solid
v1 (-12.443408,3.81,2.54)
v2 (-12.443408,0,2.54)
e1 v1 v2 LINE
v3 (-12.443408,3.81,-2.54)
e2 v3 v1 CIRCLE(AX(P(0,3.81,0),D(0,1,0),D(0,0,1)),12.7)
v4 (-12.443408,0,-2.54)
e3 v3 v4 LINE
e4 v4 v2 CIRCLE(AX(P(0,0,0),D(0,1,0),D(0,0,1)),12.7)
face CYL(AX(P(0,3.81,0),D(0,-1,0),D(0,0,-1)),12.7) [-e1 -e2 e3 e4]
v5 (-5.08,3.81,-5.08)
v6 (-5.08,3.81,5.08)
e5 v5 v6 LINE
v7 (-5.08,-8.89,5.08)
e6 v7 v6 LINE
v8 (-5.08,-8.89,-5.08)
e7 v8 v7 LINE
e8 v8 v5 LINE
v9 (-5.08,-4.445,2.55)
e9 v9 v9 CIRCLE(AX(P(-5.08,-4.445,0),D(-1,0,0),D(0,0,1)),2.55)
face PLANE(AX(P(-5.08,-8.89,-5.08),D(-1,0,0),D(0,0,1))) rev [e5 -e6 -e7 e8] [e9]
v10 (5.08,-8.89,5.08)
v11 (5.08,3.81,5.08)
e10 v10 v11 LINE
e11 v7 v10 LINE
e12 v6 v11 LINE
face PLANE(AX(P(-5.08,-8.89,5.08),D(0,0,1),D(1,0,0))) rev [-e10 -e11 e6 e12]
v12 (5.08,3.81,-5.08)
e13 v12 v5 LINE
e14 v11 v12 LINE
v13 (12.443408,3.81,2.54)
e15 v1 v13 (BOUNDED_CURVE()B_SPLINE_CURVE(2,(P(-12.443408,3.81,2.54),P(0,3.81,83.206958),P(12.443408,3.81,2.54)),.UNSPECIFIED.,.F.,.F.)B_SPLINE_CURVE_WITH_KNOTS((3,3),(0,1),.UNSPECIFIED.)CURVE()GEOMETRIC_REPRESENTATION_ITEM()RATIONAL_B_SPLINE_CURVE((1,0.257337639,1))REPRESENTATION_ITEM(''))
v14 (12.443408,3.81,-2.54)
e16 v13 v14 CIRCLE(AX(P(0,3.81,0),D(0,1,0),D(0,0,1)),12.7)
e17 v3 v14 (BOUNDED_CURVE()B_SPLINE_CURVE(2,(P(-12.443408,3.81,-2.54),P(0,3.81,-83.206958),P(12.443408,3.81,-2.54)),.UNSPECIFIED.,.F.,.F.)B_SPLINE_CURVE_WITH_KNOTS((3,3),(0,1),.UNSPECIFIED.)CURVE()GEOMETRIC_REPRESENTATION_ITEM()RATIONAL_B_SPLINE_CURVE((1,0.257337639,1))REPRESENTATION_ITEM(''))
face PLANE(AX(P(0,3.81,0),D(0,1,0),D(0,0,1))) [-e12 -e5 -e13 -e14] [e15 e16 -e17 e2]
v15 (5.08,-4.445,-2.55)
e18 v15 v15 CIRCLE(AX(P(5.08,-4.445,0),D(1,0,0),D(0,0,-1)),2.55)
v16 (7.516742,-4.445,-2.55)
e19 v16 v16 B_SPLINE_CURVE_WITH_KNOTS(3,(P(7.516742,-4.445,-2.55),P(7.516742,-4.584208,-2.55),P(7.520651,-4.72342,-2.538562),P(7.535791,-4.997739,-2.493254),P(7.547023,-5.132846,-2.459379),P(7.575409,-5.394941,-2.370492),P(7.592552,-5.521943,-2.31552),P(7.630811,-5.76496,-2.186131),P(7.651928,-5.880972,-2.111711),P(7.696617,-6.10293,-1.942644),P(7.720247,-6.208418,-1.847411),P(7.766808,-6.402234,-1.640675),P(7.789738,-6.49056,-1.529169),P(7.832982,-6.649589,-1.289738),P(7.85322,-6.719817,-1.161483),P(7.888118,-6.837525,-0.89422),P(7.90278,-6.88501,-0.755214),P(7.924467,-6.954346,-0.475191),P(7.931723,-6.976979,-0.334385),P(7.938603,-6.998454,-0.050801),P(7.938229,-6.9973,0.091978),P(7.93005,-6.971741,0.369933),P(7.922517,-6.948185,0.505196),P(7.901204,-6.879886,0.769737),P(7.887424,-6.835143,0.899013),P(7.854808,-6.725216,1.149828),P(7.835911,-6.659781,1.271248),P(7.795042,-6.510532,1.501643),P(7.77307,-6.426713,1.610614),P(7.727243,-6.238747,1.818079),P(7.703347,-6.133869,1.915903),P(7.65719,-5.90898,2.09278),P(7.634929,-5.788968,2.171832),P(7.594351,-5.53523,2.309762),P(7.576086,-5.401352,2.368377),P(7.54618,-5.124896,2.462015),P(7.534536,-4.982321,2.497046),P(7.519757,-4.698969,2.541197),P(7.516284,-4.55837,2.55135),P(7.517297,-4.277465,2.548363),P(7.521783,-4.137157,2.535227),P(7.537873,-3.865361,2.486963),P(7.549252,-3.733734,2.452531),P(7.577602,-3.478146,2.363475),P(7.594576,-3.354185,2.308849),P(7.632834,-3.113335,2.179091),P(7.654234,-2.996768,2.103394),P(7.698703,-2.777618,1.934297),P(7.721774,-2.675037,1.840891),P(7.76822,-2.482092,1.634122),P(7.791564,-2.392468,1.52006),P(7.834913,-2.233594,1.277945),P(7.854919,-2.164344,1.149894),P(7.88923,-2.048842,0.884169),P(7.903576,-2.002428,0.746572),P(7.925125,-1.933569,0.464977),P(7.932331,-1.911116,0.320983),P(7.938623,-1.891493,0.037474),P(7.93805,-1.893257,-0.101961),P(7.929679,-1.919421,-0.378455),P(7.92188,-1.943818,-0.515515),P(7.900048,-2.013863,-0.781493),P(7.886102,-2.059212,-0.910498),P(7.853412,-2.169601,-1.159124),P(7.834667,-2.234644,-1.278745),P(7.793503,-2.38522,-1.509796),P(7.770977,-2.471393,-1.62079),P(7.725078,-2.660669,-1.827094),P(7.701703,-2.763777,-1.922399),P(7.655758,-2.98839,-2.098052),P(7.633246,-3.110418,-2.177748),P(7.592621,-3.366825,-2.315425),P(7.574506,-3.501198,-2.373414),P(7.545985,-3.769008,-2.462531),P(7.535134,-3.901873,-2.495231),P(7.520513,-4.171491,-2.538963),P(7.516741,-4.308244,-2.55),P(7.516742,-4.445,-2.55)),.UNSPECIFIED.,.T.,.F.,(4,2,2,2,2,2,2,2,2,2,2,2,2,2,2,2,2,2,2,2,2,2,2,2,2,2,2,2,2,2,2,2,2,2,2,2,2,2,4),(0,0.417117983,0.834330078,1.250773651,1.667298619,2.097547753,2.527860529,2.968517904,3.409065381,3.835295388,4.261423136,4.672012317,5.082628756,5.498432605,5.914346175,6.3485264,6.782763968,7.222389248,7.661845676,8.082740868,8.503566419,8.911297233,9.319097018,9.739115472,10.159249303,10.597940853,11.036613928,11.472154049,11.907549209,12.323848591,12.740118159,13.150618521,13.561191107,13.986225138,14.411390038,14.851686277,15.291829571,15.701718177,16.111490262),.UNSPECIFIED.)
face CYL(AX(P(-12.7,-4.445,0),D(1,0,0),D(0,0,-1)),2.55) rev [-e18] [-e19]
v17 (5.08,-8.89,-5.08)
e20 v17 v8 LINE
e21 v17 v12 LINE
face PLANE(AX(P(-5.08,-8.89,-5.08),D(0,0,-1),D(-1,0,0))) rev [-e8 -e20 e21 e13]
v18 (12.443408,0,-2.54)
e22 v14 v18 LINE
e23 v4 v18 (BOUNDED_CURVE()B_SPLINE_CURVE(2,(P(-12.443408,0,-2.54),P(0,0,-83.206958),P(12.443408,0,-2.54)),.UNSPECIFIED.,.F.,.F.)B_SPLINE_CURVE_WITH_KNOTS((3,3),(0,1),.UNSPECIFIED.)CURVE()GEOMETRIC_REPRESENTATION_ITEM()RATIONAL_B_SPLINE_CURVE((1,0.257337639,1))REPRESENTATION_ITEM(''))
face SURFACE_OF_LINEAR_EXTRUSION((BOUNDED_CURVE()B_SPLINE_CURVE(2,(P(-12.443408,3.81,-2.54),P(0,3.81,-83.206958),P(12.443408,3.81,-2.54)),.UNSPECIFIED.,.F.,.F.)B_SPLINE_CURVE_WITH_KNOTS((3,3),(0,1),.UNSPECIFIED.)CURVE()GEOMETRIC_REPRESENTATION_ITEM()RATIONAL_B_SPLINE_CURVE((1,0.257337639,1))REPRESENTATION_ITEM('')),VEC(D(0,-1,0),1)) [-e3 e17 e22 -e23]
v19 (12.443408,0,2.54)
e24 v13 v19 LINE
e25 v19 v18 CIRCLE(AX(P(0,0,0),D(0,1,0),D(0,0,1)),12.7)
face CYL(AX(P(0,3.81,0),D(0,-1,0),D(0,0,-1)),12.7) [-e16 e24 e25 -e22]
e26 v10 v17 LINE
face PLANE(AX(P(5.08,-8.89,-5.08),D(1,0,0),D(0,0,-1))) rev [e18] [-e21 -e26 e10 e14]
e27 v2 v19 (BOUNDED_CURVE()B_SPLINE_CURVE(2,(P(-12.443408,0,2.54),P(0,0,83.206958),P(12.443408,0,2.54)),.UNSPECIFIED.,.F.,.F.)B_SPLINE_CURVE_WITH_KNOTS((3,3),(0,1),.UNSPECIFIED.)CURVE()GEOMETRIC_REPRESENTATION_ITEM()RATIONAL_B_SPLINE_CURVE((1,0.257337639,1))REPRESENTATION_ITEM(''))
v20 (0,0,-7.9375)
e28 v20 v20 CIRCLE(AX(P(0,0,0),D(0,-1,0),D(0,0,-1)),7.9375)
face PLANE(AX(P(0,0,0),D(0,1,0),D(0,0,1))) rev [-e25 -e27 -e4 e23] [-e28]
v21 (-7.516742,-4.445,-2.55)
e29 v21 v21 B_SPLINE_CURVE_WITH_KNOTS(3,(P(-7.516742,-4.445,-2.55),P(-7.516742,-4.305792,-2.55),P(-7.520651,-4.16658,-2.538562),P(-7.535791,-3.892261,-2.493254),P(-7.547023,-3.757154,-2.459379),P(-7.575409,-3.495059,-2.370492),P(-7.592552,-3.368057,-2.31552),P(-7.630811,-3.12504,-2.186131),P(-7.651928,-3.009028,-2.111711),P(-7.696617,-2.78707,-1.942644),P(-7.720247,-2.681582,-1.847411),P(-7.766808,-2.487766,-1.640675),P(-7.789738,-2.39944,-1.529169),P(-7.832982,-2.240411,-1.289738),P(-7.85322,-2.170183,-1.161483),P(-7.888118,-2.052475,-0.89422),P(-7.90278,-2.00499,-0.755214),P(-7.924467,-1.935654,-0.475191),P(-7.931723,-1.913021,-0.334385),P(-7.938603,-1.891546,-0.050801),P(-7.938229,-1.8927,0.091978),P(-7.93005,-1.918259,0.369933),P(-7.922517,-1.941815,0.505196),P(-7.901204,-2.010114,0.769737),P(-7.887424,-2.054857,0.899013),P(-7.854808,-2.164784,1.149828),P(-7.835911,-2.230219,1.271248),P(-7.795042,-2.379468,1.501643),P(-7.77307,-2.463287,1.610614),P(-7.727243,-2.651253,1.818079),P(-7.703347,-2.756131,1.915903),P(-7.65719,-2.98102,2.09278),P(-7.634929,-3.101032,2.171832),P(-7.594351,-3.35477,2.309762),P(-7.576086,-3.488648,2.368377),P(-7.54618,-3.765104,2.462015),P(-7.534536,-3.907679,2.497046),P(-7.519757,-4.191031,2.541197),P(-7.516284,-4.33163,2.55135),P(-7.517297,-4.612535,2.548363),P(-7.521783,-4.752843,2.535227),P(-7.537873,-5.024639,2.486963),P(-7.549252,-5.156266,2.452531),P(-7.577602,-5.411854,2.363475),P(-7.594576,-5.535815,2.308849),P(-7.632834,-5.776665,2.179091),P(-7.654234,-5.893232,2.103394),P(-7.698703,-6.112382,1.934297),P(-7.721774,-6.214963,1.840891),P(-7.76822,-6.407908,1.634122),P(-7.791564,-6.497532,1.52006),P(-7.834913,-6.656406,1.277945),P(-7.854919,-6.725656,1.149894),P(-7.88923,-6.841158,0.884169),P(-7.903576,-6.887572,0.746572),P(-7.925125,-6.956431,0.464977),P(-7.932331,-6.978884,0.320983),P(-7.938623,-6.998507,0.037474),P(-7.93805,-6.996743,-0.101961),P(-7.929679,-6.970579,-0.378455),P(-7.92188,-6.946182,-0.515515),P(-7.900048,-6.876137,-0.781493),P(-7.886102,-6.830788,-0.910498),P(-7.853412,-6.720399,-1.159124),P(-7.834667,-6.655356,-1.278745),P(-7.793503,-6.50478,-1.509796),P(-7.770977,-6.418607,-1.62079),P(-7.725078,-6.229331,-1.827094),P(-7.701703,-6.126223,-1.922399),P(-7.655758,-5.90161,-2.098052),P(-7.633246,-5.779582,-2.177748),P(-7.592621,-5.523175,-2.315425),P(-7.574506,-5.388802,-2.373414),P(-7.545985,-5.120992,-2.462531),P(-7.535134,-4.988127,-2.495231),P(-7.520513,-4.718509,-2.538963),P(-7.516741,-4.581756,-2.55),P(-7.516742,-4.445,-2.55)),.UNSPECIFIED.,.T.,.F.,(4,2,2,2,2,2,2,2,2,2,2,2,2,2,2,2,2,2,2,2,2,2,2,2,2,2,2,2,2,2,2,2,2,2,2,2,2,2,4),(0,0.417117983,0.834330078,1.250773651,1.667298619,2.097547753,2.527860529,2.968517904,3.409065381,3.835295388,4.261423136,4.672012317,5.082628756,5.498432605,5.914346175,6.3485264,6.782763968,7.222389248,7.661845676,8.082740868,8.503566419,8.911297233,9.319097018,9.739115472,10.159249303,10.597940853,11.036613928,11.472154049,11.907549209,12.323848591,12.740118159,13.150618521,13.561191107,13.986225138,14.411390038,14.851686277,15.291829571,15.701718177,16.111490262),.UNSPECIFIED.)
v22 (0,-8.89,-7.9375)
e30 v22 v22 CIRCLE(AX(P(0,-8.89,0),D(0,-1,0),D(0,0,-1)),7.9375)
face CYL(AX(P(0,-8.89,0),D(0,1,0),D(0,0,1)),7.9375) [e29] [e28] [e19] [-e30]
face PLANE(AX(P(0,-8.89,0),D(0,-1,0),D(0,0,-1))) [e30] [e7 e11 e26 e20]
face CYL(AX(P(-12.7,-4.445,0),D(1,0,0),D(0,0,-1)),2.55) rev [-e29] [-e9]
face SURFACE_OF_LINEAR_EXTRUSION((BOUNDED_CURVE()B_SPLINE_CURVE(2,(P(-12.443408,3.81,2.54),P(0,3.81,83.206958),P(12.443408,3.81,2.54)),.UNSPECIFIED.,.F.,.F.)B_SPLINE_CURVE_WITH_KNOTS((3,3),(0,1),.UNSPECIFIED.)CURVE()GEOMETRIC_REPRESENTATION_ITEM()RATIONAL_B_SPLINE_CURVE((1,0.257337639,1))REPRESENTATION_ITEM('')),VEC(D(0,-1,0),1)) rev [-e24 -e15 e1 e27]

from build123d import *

# Parameters (mm, degrees)
BOSS_EXTRUDE1_DEPTH     = 3.81
SKETCH3_R               = 7.9375
BOSS_EXTRUDE2_DEPTH     = 8.89
SKETCH2_W               = 10.16
SKETCH2_H               = 10.16
CUT_EXTRUDE1_DEPTH      = 27.181720844
CUT_EXTRUDE2_DEPTH      = 30.459141437
CUT_EXTRUDE2_DEPTH_BACK = 30.459141437
SKETCH4_R               = 2.55


# Read off the part's stored shape, not the designer's step: Boss-Extrude1
with BuildPart() as part:
    # Boss-Extrude1 outline → Boss-Extrude1 (new body)
    with BuildSketch(Plane(origin=(0, 0, 0), x_dir=(1, 0, 0), z_dir=(0, 1, 0))):
        with BuildLine():
            ThreePointArc((12.443407893, -2.54), (12.7, 0), (12.443407893, 2.54))
            add(Edge.make_bspline(
                [(-12.443407893, 2.54), (0, 83.206957613), (12.443407893, 2.54)],
                knots=[0, 0, 0, 1, 1, 1], degree=2, weights=[1, 0.257337639, 1]))
            ThreePointArc((-12.443407893, 2.54), (-12.7, 0), (-12.443407893, -2.54))
            add(Edge.make_bspline(
                [(-12.443407893, -2.54), (0, -83.206957613), (12.443407893, -2.54)],
                knots=[0, 0, 0, 1, 1, 1], degree=2, weights=[1, 0.257337639, 1]))
        make_face()
    extrude(amount=BOSS_EXTRUDE1_DEPTH)

    # Sketch3 → Boss-Extrude2 (add)
    with BuildSketch(Plane.XZ):
        with Locations(Location((0, 0, 0), (0, 0, 270))):
            Circle(SKETCH3_R)
    extrude(amount=BOSS_EXTRUDE2_DEPTH)

    # Sketch2 → Cut-Extrude1 (cut, through all)
    with BuildSketch(Plane(origin=(0, 3.81, 0), x_dir=(1, 0, 0), z_dir=(0, 1, 0))):
        Rectangle(SKETCH2_W, SKETCH2_H)
    extrude(amount=-CUT_EXTRUDE1_DEPTH, mode=Mode.SUBTRACT)

    # Sketch4 → Cut-Extrude2 (cut, two sides: drawn at the far end of the back side and taken through both)
    with BuildSketch(Plane(origin=(7.9375, 0, 0), x_dir=(0, 0, -1), z_dir=(1, 0, 0)).offset(-CUT_EXTRUDE2_DEPTH_BACK)):
        with Locations((0, -4.445)):
            Circle(SKETCH4_R)
    extrude(amount=CUT_EXTRUDE2_DEPTH + CUT_EXTRUDE2_DEPTH_BACK, mode=Mode.SUBTRACT)


solid = part.part
